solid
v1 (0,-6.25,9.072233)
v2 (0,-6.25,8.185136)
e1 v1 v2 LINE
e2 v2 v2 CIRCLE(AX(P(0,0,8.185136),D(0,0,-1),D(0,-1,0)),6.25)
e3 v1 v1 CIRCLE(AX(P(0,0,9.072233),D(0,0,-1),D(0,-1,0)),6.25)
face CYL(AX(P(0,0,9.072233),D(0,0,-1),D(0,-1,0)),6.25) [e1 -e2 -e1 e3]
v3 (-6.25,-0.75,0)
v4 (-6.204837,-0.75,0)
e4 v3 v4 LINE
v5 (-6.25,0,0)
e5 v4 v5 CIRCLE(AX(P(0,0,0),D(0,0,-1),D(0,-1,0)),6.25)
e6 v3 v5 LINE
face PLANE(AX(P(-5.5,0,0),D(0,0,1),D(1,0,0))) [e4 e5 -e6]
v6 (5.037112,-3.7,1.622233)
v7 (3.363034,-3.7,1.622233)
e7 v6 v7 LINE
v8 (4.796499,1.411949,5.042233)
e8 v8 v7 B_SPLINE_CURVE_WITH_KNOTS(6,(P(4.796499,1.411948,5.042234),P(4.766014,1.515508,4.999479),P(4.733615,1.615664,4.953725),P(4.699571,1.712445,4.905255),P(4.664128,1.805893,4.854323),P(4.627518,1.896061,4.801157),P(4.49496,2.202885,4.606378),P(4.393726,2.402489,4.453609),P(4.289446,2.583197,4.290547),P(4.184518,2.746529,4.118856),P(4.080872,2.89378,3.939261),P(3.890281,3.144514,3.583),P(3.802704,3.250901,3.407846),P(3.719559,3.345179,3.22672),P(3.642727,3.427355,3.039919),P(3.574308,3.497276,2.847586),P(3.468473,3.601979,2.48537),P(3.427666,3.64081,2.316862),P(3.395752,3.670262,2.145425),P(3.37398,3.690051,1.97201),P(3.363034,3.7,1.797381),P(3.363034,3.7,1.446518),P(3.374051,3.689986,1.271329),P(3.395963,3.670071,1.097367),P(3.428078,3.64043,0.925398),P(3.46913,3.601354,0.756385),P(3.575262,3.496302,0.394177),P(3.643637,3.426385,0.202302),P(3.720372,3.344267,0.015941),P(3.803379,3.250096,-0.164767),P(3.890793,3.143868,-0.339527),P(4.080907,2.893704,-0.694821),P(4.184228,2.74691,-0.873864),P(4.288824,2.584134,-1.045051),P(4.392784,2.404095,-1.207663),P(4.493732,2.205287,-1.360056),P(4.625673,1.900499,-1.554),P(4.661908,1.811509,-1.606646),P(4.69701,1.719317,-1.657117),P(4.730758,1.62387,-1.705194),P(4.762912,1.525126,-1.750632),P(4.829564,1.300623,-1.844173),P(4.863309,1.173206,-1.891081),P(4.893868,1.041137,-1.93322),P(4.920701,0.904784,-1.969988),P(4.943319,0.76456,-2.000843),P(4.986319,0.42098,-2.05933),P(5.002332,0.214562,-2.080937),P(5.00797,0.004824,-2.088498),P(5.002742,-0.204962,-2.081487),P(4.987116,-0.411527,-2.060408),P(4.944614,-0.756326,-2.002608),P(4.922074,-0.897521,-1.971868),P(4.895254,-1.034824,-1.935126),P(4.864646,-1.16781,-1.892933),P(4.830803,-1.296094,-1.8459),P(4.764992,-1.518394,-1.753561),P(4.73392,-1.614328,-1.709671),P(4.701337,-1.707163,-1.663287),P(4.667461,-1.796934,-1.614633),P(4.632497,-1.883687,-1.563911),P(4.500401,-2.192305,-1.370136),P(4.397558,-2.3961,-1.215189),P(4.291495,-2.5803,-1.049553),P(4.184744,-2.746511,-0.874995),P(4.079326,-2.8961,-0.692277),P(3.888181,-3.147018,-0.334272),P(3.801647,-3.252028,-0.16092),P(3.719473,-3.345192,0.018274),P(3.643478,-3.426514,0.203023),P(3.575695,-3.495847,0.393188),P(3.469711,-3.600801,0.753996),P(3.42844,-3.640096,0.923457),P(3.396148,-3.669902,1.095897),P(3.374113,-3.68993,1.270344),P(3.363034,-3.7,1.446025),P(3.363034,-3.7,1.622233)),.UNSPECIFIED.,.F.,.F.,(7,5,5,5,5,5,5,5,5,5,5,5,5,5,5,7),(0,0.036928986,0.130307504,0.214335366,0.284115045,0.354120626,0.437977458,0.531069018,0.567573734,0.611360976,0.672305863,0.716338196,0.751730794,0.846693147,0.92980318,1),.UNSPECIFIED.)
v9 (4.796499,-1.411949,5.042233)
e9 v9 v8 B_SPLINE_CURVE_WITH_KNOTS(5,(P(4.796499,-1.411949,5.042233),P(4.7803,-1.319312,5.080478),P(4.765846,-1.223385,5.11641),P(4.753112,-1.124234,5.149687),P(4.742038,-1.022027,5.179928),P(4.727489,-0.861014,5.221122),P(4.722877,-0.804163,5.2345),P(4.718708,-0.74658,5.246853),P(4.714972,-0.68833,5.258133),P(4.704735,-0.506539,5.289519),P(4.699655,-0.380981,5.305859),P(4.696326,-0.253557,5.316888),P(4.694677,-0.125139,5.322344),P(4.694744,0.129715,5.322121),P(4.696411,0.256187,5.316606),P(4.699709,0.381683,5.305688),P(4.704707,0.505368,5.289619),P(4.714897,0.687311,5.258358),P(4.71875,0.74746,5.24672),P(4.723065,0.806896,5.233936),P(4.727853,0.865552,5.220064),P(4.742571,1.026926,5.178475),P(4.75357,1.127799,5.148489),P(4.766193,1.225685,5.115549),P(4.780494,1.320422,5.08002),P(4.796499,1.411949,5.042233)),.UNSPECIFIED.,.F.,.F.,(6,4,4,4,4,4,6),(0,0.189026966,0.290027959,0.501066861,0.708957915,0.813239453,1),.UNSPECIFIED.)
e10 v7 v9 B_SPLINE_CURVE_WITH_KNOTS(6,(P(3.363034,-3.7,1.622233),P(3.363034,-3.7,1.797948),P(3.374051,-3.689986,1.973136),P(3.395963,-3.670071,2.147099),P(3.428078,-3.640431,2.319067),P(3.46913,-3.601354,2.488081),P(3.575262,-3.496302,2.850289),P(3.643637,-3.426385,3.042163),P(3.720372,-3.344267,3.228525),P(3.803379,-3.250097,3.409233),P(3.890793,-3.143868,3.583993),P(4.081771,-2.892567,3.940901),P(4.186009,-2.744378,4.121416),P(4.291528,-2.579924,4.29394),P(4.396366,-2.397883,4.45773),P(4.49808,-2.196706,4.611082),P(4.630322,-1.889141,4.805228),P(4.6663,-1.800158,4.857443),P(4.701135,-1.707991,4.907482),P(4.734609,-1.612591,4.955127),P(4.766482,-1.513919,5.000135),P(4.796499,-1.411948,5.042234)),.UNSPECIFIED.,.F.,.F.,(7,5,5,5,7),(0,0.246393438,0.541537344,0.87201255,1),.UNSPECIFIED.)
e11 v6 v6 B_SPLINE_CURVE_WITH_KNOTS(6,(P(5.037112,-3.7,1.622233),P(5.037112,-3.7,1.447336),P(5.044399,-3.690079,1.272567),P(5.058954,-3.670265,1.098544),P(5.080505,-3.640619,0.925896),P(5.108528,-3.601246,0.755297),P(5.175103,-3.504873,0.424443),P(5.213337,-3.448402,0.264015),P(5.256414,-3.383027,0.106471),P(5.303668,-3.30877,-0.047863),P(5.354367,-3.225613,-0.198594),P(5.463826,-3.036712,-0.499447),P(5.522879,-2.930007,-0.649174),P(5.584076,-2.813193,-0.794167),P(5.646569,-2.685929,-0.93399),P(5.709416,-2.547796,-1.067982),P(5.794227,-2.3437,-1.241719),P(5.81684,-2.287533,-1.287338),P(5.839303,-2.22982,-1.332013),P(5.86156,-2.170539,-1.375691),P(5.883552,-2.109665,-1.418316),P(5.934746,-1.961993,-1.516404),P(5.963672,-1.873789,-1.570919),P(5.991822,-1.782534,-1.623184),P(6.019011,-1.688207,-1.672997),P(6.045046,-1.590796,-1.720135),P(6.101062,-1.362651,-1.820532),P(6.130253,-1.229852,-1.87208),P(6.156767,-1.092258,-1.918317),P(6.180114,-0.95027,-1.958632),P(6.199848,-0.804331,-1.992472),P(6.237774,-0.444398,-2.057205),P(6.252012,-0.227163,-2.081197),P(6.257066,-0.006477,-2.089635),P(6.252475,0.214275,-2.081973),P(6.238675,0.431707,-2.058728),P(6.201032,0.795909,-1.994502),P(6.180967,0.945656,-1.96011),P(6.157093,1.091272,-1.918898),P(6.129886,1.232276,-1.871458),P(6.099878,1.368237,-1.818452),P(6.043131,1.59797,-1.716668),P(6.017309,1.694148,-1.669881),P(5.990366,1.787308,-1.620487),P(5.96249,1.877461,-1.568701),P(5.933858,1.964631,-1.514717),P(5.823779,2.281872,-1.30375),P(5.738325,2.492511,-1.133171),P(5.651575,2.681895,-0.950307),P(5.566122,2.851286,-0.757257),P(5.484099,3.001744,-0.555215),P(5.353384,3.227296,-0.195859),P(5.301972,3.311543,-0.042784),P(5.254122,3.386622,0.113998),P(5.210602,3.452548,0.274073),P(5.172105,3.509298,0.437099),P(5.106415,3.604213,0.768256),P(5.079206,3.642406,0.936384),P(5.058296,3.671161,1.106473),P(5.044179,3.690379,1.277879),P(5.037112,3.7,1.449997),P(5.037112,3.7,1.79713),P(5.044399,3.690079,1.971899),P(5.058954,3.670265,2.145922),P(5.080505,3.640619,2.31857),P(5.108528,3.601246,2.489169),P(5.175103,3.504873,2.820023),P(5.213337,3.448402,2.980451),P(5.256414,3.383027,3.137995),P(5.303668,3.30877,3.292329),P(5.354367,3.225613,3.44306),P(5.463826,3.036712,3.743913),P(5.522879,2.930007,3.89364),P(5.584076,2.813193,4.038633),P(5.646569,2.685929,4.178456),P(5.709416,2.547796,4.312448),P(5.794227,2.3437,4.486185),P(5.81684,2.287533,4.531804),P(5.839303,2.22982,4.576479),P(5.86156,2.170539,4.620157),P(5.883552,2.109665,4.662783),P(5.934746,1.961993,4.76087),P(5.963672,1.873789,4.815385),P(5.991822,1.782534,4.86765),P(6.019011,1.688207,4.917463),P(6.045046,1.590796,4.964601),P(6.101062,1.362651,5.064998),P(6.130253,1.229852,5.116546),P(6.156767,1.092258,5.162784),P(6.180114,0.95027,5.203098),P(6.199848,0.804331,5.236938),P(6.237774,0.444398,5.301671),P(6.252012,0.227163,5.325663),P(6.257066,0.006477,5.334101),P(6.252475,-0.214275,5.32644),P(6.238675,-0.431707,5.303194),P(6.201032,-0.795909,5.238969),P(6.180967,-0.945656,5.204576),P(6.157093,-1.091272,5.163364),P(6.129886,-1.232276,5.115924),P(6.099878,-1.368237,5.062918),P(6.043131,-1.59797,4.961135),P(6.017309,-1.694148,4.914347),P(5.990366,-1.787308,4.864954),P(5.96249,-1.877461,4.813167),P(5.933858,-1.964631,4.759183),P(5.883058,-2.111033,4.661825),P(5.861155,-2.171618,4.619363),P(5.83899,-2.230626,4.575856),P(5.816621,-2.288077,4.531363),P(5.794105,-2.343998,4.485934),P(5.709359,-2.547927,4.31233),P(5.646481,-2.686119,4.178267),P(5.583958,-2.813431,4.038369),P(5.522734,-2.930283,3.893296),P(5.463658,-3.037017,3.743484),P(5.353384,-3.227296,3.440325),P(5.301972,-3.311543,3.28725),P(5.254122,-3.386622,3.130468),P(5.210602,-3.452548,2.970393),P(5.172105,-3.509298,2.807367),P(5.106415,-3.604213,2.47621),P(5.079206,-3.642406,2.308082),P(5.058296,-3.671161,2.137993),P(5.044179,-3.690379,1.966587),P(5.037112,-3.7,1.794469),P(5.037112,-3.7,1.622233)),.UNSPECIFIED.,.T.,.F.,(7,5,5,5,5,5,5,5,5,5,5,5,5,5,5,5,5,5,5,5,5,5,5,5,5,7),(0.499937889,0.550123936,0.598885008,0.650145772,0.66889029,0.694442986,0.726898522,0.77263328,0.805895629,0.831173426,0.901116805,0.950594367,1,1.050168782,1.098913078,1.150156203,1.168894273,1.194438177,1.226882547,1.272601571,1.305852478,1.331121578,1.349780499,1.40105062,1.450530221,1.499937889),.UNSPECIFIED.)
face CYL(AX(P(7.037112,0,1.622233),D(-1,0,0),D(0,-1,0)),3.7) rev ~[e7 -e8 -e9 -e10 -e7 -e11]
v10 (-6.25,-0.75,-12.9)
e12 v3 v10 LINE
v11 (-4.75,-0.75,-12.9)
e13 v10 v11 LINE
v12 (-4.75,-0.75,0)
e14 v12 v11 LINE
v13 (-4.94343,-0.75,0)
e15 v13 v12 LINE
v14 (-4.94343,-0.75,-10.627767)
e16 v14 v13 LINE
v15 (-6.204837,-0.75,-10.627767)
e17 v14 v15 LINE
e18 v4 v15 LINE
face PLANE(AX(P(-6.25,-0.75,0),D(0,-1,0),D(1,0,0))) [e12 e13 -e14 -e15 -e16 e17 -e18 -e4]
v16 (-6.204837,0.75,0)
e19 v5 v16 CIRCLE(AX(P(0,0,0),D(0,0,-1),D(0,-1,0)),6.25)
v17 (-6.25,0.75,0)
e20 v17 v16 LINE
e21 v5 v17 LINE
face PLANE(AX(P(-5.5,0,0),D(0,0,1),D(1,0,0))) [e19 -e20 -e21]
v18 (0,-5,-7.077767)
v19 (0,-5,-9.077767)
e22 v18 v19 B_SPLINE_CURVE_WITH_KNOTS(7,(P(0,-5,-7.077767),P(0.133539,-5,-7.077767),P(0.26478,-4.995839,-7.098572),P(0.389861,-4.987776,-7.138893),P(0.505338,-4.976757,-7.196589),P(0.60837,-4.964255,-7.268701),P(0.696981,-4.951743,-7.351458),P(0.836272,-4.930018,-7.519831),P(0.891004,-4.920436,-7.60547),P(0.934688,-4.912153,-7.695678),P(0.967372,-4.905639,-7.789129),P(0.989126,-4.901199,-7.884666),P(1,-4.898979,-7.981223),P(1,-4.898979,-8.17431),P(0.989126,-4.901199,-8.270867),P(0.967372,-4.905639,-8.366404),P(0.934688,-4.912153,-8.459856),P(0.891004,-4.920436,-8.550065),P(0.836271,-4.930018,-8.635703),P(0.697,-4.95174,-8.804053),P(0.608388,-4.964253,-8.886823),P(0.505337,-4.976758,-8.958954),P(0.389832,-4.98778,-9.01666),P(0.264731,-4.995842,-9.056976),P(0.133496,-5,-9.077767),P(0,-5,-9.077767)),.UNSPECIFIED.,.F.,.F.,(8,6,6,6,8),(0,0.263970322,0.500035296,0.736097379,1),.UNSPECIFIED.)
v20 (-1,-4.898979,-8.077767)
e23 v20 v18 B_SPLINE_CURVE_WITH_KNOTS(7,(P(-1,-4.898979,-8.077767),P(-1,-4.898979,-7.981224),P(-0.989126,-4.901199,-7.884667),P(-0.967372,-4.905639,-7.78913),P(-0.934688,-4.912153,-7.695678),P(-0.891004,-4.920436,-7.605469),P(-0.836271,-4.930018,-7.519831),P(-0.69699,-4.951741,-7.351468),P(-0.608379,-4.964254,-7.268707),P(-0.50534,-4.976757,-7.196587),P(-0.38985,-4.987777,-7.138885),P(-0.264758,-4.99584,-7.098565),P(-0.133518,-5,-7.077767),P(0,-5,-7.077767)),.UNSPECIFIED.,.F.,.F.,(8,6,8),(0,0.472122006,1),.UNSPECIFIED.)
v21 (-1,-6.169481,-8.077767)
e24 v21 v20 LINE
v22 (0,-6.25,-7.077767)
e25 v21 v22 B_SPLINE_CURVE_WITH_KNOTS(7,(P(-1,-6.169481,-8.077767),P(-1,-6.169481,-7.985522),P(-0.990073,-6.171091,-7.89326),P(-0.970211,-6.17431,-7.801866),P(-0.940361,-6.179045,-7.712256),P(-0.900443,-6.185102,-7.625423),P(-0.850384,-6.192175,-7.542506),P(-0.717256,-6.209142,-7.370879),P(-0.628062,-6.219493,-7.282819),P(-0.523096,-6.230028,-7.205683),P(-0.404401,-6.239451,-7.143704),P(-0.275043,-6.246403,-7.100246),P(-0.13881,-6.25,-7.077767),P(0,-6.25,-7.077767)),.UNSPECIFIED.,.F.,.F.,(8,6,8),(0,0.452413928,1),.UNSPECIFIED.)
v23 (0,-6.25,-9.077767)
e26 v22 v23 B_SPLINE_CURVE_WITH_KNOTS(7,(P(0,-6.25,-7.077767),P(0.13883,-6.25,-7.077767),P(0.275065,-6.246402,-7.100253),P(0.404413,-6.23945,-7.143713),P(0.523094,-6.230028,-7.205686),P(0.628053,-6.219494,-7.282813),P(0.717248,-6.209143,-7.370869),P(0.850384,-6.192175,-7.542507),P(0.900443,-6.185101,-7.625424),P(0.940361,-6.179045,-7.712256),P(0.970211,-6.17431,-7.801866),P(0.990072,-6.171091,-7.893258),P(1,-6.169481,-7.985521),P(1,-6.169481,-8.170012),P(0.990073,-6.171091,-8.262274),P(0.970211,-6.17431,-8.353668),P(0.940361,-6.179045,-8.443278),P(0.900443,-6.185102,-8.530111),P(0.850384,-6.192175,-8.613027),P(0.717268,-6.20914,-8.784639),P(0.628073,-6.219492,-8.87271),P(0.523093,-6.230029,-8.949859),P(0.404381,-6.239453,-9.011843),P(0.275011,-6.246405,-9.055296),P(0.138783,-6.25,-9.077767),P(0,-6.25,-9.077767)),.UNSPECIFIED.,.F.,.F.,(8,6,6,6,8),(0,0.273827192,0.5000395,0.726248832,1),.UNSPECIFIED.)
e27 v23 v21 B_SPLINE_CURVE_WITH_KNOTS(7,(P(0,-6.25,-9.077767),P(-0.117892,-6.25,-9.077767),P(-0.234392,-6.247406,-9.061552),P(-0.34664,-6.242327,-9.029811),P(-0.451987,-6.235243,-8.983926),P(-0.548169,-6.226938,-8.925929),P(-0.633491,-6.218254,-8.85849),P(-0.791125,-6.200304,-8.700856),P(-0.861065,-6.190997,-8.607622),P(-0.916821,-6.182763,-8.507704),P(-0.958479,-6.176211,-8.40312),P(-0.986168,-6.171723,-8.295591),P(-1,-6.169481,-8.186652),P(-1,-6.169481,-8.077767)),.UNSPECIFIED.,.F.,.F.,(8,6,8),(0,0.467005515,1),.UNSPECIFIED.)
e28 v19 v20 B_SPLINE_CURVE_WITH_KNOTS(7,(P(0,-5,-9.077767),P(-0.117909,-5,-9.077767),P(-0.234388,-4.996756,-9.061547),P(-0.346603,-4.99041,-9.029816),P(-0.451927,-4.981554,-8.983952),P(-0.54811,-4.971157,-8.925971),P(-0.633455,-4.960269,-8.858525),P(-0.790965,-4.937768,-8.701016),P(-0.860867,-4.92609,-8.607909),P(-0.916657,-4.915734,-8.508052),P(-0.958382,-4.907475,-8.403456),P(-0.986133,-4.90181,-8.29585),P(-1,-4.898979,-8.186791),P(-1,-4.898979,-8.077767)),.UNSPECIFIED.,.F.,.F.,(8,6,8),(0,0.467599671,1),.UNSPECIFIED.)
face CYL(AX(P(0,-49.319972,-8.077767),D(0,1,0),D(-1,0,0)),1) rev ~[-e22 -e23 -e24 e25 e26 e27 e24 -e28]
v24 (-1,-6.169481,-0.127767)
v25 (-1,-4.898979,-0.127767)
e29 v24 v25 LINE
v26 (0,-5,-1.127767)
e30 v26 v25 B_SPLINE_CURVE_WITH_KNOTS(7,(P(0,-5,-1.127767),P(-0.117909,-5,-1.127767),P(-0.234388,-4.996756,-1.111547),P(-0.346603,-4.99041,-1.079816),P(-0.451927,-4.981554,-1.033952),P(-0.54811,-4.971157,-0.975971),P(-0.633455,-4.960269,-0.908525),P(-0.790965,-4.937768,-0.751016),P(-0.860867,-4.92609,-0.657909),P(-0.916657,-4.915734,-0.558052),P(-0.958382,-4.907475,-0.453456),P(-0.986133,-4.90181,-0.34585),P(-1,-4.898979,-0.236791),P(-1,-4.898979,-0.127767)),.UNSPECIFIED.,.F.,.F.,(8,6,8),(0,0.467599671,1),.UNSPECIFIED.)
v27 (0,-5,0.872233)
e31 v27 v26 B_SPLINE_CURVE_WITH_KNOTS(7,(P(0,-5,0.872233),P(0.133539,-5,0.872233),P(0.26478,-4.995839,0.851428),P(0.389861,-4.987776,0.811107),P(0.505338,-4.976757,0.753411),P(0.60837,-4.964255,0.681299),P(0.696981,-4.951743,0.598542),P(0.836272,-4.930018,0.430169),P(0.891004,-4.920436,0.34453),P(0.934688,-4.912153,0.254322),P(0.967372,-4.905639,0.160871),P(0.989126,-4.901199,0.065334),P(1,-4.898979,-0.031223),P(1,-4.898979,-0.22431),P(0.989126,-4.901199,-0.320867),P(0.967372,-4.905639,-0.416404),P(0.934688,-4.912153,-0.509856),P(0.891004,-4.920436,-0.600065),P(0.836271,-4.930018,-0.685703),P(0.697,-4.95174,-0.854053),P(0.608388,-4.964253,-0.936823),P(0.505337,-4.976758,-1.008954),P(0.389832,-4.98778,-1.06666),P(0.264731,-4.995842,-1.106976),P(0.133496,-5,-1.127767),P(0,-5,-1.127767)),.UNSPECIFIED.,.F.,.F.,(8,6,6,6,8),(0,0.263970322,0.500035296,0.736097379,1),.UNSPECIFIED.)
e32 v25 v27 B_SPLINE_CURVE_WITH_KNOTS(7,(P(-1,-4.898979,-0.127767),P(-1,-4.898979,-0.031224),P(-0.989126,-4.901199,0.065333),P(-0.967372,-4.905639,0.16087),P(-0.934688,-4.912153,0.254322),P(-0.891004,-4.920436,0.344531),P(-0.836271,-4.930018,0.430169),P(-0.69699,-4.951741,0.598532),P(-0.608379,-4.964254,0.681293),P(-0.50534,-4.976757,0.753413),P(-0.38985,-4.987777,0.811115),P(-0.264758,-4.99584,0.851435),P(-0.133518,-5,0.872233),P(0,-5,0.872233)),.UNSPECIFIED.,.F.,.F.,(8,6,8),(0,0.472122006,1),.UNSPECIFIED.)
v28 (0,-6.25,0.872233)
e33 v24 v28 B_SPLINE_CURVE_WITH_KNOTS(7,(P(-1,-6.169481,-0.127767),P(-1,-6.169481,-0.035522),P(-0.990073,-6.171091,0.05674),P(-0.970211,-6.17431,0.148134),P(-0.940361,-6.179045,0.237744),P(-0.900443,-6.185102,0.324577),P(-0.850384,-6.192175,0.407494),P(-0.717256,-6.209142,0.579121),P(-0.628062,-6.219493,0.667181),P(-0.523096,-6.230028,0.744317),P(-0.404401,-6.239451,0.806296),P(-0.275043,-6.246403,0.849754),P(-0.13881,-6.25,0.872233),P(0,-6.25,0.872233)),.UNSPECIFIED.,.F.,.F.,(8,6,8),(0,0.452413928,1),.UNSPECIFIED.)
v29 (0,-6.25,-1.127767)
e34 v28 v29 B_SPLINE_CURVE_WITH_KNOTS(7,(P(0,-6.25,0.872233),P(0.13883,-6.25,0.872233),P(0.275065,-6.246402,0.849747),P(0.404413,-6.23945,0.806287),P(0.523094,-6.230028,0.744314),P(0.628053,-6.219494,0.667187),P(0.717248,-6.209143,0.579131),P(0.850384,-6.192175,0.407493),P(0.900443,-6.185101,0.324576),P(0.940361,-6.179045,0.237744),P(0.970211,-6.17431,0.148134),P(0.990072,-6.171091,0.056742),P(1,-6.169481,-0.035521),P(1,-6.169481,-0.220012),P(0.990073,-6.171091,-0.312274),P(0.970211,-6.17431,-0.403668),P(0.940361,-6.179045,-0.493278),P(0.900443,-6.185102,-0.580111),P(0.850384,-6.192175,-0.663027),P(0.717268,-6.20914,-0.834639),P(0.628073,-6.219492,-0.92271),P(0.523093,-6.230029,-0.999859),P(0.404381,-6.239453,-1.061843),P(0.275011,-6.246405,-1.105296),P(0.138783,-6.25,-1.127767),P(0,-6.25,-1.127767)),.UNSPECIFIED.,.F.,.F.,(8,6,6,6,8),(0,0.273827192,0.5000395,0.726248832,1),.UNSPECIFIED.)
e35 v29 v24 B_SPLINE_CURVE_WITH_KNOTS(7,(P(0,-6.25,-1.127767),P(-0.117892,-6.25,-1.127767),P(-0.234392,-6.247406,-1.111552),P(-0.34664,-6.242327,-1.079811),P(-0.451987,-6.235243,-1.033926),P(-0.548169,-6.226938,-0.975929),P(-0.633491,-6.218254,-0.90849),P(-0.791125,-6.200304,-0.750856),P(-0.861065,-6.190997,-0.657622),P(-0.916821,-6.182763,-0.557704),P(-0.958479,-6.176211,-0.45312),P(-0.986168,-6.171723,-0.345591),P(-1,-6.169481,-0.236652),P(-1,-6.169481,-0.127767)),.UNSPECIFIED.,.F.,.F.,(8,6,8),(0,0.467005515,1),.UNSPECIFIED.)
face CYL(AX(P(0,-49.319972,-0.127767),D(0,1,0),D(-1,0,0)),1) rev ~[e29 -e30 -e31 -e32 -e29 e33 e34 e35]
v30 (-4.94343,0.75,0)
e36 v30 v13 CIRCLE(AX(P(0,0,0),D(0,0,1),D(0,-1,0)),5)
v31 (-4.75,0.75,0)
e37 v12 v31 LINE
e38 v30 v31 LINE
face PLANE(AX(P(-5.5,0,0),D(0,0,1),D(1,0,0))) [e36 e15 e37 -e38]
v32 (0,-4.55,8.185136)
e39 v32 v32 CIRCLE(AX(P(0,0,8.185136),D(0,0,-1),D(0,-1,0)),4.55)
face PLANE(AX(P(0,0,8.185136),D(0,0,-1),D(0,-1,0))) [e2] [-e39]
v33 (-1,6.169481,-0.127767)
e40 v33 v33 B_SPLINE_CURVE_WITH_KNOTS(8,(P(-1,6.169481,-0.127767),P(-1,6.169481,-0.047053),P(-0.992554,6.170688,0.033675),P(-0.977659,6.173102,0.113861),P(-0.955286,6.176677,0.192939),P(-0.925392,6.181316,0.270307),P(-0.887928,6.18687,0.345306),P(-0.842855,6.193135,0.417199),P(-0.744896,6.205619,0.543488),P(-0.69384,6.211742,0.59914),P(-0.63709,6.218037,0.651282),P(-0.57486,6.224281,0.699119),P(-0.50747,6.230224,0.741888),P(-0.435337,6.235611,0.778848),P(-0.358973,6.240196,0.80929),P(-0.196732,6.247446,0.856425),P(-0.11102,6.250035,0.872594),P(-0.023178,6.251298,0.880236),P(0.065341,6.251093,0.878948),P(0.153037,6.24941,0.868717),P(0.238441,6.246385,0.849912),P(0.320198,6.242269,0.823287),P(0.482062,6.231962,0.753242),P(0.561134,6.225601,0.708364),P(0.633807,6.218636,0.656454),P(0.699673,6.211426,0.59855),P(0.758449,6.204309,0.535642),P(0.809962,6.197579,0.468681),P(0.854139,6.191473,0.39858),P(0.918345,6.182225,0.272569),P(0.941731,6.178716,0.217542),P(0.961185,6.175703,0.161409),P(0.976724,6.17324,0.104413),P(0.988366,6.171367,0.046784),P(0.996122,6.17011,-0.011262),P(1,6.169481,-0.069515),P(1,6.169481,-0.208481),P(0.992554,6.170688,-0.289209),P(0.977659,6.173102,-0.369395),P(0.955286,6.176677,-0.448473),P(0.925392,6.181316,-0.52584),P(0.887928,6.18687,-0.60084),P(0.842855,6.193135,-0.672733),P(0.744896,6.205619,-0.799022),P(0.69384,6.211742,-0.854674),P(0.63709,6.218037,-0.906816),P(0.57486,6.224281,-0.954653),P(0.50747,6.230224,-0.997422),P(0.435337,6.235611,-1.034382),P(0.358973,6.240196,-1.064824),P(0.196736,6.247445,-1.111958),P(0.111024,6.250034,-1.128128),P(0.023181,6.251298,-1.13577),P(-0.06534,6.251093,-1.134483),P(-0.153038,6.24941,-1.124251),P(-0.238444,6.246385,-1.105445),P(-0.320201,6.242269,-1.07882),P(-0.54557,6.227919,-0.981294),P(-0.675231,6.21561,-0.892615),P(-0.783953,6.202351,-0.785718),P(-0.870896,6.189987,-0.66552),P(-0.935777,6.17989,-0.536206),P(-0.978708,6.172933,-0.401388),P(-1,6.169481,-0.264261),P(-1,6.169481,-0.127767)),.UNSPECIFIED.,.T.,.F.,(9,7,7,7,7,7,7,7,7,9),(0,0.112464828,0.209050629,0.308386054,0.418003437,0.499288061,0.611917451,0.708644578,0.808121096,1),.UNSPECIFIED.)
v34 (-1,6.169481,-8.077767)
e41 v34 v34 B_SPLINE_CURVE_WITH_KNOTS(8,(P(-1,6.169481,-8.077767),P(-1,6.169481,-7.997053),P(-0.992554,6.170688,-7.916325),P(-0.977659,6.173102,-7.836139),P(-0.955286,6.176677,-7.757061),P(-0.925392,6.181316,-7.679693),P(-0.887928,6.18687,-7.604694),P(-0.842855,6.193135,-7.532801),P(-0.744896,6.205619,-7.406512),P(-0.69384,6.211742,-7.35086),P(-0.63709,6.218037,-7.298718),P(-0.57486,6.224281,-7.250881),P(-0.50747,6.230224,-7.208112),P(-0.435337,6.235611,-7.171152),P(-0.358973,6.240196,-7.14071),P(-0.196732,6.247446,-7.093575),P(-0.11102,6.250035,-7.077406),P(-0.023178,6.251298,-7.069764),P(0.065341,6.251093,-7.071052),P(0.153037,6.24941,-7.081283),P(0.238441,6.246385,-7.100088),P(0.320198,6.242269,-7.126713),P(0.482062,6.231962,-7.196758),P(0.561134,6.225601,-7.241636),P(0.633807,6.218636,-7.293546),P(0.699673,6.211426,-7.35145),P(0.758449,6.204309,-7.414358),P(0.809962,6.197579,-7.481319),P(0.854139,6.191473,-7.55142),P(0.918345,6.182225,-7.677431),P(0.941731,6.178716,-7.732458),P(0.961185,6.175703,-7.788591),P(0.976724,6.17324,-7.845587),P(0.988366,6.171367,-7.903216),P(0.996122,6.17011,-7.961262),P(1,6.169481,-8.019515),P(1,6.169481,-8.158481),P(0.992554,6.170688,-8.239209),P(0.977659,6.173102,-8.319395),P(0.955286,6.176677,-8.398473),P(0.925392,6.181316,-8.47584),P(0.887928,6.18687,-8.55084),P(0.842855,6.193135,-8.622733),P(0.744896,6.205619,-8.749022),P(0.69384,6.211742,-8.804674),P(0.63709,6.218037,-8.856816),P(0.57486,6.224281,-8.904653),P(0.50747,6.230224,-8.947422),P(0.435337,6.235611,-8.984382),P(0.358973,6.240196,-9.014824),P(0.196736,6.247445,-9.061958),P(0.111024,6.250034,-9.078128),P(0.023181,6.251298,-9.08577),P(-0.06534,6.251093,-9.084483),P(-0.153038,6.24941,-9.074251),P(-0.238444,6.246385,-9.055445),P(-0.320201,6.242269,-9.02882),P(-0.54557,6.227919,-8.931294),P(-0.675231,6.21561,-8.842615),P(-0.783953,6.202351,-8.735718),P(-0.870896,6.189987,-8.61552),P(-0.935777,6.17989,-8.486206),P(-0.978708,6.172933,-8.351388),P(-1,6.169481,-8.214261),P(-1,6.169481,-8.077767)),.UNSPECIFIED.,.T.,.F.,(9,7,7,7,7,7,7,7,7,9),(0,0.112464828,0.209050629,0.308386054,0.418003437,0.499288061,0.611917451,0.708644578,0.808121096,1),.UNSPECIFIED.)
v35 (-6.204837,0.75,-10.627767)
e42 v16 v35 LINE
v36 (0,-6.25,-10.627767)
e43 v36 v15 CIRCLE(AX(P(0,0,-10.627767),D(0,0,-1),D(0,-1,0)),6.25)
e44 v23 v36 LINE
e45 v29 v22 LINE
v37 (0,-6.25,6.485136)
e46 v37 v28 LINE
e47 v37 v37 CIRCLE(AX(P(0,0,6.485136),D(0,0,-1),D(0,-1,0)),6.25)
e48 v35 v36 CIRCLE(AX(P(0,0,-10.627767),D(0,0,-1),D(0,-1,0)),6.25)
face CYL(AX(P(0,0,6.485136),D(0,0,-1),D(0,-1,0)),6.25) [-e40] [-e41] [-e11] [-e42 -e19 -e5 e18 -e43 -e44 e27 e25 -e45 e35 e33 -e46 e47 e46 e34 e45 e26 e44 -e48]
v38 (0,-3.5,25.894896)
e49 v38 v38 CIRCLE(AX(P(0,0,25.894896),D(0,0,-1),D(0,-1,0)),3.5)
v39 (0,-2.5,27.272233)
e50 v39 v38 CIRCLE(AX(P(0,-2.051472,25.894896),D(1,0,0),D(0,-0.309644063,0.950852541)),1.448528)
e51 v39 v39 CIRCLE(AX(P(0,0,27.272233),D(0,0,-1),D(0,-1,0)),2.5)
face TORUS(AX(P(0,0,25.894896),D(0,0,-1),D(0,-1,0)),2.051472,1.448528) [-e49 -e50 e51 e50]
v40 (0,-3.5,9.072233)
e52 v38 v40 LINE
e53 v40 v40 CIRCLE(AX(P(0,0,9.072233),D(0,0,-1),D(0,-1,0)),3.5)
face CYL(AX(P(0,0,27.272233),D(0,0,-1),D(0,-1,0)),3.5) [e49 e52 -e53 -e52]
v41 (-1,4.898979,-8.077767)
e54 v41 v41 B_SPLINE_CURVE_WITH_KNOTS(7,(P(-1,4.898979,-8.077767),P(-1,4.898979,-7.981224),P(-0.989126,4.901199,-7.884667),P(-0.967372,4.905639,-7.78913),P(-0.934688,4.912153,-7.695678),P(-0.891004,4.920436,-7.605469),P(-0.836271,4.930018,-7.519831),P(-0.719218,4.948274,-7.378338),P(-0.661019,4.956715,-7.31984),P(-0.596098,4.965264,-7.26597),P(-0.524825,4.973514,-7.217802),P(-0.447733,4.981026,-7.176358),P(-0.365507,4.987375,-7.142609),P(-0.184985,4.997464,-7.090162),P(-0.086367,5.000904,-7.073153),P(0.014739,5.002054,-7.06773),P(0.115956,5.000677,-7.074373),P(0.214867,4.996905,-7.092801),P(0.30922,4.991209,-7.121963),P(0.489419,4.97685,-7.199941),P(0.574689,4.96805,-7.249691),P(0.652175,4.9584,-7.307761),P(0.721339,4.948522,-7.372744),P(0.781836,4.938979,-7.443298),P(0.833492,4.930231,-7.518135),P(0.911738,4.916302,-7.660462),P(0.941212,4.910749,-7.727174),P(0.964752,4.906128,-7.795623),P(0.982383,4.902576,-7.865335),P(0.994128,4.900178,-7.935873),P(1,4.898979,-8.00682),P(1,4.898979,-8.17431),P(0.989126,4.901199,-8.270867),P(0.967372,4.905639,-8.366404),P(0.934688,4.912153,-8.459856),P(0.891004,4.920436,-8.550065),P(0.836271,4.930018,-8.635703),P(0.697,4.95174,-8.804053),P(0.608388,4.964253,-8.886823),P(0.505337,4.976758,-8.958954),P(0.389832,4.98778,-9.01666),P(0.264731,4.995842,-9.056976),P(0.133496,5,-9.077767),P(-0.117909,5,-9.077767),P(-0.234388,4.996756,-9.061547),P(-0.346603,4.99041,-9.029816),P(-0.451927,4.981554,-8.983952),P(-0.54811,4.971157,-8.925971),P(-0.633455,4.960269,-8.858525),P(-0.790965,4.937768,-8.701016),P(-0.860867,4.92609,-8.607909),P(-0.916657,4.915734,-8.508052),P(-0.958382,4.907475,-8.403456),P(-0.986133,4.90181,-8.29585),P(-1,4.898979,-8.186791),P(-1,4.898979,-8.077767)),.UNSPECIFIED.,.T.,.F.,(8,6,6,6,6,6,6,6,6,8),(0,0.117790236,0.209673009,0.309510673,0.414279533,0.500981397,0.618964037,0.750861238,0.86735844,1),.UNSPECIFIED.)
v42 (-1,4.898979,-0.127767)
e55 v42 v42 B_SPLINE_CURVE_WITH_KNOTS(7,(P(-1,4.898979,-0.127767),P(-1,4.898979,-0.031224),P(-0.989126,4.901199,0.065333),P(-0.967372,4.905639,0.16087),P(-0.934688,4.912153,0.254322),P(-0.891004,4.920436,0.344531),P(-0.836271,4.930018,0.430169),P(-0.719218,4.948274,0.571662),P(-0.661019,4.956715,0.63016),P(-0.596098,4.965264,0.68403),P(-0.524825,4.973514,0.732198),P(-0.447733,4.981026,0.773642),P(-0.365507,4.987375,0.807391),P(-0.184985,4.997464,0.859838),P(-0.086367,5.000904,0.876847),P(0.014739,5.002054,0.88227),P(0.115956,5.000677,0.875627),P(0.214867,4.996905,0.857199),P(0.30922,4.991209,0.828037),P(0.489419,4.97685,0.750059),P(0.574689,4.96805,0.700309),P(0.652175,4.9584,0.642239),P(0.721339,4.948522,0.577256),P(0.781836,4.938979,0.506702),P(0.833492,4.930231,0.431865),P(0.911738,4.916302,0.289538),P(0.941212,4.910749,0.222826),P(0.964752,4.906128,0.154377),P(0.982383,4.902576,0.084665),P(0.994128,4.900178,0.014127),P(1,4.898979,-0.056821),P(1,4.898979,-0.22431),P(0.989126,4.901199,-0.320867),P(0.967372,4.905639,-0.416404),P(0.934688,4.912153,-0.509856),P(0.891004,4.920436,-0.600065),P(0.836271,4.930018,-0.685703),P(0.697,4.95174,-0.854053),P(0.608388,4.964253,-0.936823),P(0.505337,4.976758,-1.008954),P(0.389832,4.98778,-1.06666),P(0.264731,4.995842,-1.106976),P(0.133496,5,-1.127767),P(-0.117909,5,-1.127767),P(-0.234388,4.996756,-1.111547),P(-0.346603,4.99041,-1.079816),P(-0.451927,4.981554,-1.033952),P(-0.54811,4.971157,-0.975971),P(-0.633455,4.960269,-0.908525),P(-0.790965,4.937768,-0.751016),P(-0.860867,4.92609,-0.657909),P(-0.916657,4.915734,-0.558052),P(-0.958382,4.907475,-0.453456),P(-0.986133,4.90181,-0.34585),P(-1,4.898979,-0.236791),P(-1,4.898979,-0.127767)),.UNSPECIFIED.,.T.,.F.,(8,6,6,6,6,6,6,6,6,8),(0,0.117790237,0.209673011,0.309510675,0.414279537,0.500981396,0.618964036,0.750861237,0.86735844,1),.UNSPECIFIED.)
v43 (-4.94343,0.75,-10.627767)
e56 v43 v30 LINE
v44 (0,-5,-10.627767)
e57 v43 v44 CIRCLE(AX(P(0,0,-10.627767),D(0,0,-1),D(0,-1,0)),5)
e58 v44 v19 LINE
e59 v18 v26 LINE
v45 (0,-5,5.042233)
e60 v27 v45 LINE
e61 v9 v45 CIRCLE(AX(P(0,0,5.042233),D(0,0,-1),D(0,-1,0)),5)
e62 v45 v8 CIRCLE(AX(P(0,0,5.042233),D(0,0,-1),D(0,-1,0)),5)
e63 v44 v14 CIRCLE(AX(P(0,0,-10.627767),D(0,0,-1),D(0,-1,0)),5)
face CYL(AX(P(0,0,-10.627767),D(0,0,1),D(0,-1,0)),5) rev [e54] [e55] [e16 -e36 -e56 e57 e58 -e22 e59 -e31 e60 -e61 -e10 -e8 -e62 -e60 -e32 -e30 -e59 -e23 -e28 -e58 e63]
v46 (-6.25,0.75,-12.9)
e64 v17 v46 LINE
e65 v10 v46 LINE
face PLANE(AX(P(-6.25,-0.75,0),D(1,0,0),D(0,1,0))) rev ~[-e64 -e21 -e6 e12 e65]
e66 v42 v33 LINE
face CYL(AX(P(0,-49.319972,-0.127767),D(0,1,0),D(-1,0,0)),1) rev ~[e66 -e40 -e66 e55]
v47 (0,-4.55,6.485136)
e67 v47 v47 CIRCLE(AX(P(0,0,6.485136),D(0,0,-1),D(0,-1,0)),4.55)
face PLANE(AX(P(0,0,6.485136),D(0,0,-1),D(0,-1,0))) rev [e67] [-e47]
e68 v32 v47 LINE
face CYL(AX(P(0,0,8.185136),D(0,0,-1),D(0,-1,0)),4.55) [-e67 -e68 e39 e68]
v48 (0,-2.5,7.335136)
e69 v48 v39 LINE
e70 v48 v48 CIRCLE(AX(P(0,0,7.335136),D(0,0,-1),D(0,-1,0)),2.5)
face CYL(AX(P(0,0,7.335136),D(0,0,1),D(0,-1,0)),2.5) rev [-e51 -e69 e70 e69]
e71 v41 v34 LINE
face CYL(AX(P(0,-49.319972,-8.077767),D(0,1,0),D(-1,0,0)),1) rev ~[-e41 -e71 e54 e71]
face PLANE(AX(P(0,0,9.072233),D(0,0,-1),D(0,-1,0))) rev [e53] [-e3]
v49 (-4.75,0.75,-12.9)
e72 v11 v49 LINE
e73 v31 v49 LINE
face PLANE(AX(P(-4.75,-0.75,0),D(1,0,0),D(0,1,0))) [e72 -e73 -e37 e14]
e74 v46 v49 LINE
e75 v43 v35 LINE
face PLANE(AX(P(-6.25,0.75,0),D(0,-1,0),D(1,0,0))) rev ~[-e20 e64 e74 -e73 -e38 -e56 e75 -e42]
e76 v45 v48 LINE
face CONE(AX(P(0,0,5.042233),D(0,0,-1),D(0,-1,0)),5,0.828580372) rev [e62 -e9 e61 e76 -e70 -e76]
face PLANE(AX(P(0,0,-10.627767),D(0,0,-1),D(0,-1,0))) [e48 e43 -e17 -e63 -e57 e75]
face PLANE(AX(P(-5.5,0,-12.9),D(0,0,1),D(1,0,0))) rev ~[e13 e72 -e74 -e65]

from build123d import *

# Parameters (mm, degrees)
F5_D      = 7.4
F5_DEPTH  = 2
F5_START  = 2.3628878
F5_TIP    = 2.2231842904
F8_D      = 2
F10_W     = 1.5
F10_H     = 1.7
F11_DEPTH = 1.8
F13_W     = 1.5
F13_H     = 1.5
F14_DEPTH = 12.9


# Not quite as in the source:
# - a fillet or chamfer that OpenCascade refuses, or shapes differently, is made with other operations: its cross-section is extruded or revolved along the edge and cut away or added


with BuildPart() as f1:
    # F0 (on Right) → F1 (revolve)
    with BuildSketch(Plane.YZ):
        Polygon((-2.5, 27.272233048), (-3.5, 27.272233048), (-3.5, 9.072233048), (-6.25, 9.072233048), (-6.25, 8.1851361653), (-4.55, 8.1851361653), (-4.55, 6.4851361653), (-6.25, 6.4851361653), (-6.25, 5.042233048), (-6.25, -10.627766952), (-5, -10.627766952), (-5, 5.042233048), (-2.5, 7.3351361653), align=None)
    revolve(axis=Axis((0, 0, 6.4422870055), (0, 0, -1)))

    # F2: fillet of radius 1.4485281374 on 1 edges, made by hand

    # F2_s1 → F2_t2 (revolve, cut)
    with BuildSketch(Plane.YZ):
        with BuildLine():
            ThreePointArc((-2.5, 27.272233048), (-3.2236363972, 26.7459334429), (-3.5, 25.8948963881))
            Line((-3.5, 25.8948963881), (-3.5, 27.272233048))
            Line((-3.5, 27.272233048), (-2.5, 27.272233048))
        make_face()
    revolve(axis=Axis((0, 0, 27.272233048), (0, 0, -1)), mode=Mode.SUBTRACT)

    # F5
    # its depths count from where the whole tool has entered the part; down to there all is cleared
    with Locations(Plane.YZ.offset(7.4)):
        with Locations((0, 1.622233048)):
            Hole(F5_D / 2, depth=F5_START)
    with Locations(Plane.YZ.offset(7.4).offset(-F5_START)):
        with Locations((0, 1.622233048)):
            Hole(F5_D / 2, depth=F5_DEPTH)
            with Locations((0, 0, -(F5_DEPTH + F5_TIP / 2))):  # 118° drill point
                Cone(0, F5_D / 2, F5_TIP, mode=Mode.SUBTRACT)

    # F8 (through all)
    with Locations(Plane.XZ.offset(7.5)):
        with Locations((0, -8.077766952), (0, -0.127766952)):
            Hole(F8_D / 2)

    # F13 (on Top) → F14 (join)
    with BuildSketch(Plane.XY):
        with Locations((-5.5, 0)):
            Rectangle(F13_W, F13_H)
    extrude(amount=-F14_DEPTH)


with BuildPart() as f11:
    # F10 (on offset) → F11 (new body)
    with BuildSketch(Plane.YZ.offset(-6.27)):
        with Locations((-0.0197449699, -11.4840940437)):
            Rectangle(F10_W, F10_H)
    extrude(amount=F11_DEPTH)


solid = f1.part
